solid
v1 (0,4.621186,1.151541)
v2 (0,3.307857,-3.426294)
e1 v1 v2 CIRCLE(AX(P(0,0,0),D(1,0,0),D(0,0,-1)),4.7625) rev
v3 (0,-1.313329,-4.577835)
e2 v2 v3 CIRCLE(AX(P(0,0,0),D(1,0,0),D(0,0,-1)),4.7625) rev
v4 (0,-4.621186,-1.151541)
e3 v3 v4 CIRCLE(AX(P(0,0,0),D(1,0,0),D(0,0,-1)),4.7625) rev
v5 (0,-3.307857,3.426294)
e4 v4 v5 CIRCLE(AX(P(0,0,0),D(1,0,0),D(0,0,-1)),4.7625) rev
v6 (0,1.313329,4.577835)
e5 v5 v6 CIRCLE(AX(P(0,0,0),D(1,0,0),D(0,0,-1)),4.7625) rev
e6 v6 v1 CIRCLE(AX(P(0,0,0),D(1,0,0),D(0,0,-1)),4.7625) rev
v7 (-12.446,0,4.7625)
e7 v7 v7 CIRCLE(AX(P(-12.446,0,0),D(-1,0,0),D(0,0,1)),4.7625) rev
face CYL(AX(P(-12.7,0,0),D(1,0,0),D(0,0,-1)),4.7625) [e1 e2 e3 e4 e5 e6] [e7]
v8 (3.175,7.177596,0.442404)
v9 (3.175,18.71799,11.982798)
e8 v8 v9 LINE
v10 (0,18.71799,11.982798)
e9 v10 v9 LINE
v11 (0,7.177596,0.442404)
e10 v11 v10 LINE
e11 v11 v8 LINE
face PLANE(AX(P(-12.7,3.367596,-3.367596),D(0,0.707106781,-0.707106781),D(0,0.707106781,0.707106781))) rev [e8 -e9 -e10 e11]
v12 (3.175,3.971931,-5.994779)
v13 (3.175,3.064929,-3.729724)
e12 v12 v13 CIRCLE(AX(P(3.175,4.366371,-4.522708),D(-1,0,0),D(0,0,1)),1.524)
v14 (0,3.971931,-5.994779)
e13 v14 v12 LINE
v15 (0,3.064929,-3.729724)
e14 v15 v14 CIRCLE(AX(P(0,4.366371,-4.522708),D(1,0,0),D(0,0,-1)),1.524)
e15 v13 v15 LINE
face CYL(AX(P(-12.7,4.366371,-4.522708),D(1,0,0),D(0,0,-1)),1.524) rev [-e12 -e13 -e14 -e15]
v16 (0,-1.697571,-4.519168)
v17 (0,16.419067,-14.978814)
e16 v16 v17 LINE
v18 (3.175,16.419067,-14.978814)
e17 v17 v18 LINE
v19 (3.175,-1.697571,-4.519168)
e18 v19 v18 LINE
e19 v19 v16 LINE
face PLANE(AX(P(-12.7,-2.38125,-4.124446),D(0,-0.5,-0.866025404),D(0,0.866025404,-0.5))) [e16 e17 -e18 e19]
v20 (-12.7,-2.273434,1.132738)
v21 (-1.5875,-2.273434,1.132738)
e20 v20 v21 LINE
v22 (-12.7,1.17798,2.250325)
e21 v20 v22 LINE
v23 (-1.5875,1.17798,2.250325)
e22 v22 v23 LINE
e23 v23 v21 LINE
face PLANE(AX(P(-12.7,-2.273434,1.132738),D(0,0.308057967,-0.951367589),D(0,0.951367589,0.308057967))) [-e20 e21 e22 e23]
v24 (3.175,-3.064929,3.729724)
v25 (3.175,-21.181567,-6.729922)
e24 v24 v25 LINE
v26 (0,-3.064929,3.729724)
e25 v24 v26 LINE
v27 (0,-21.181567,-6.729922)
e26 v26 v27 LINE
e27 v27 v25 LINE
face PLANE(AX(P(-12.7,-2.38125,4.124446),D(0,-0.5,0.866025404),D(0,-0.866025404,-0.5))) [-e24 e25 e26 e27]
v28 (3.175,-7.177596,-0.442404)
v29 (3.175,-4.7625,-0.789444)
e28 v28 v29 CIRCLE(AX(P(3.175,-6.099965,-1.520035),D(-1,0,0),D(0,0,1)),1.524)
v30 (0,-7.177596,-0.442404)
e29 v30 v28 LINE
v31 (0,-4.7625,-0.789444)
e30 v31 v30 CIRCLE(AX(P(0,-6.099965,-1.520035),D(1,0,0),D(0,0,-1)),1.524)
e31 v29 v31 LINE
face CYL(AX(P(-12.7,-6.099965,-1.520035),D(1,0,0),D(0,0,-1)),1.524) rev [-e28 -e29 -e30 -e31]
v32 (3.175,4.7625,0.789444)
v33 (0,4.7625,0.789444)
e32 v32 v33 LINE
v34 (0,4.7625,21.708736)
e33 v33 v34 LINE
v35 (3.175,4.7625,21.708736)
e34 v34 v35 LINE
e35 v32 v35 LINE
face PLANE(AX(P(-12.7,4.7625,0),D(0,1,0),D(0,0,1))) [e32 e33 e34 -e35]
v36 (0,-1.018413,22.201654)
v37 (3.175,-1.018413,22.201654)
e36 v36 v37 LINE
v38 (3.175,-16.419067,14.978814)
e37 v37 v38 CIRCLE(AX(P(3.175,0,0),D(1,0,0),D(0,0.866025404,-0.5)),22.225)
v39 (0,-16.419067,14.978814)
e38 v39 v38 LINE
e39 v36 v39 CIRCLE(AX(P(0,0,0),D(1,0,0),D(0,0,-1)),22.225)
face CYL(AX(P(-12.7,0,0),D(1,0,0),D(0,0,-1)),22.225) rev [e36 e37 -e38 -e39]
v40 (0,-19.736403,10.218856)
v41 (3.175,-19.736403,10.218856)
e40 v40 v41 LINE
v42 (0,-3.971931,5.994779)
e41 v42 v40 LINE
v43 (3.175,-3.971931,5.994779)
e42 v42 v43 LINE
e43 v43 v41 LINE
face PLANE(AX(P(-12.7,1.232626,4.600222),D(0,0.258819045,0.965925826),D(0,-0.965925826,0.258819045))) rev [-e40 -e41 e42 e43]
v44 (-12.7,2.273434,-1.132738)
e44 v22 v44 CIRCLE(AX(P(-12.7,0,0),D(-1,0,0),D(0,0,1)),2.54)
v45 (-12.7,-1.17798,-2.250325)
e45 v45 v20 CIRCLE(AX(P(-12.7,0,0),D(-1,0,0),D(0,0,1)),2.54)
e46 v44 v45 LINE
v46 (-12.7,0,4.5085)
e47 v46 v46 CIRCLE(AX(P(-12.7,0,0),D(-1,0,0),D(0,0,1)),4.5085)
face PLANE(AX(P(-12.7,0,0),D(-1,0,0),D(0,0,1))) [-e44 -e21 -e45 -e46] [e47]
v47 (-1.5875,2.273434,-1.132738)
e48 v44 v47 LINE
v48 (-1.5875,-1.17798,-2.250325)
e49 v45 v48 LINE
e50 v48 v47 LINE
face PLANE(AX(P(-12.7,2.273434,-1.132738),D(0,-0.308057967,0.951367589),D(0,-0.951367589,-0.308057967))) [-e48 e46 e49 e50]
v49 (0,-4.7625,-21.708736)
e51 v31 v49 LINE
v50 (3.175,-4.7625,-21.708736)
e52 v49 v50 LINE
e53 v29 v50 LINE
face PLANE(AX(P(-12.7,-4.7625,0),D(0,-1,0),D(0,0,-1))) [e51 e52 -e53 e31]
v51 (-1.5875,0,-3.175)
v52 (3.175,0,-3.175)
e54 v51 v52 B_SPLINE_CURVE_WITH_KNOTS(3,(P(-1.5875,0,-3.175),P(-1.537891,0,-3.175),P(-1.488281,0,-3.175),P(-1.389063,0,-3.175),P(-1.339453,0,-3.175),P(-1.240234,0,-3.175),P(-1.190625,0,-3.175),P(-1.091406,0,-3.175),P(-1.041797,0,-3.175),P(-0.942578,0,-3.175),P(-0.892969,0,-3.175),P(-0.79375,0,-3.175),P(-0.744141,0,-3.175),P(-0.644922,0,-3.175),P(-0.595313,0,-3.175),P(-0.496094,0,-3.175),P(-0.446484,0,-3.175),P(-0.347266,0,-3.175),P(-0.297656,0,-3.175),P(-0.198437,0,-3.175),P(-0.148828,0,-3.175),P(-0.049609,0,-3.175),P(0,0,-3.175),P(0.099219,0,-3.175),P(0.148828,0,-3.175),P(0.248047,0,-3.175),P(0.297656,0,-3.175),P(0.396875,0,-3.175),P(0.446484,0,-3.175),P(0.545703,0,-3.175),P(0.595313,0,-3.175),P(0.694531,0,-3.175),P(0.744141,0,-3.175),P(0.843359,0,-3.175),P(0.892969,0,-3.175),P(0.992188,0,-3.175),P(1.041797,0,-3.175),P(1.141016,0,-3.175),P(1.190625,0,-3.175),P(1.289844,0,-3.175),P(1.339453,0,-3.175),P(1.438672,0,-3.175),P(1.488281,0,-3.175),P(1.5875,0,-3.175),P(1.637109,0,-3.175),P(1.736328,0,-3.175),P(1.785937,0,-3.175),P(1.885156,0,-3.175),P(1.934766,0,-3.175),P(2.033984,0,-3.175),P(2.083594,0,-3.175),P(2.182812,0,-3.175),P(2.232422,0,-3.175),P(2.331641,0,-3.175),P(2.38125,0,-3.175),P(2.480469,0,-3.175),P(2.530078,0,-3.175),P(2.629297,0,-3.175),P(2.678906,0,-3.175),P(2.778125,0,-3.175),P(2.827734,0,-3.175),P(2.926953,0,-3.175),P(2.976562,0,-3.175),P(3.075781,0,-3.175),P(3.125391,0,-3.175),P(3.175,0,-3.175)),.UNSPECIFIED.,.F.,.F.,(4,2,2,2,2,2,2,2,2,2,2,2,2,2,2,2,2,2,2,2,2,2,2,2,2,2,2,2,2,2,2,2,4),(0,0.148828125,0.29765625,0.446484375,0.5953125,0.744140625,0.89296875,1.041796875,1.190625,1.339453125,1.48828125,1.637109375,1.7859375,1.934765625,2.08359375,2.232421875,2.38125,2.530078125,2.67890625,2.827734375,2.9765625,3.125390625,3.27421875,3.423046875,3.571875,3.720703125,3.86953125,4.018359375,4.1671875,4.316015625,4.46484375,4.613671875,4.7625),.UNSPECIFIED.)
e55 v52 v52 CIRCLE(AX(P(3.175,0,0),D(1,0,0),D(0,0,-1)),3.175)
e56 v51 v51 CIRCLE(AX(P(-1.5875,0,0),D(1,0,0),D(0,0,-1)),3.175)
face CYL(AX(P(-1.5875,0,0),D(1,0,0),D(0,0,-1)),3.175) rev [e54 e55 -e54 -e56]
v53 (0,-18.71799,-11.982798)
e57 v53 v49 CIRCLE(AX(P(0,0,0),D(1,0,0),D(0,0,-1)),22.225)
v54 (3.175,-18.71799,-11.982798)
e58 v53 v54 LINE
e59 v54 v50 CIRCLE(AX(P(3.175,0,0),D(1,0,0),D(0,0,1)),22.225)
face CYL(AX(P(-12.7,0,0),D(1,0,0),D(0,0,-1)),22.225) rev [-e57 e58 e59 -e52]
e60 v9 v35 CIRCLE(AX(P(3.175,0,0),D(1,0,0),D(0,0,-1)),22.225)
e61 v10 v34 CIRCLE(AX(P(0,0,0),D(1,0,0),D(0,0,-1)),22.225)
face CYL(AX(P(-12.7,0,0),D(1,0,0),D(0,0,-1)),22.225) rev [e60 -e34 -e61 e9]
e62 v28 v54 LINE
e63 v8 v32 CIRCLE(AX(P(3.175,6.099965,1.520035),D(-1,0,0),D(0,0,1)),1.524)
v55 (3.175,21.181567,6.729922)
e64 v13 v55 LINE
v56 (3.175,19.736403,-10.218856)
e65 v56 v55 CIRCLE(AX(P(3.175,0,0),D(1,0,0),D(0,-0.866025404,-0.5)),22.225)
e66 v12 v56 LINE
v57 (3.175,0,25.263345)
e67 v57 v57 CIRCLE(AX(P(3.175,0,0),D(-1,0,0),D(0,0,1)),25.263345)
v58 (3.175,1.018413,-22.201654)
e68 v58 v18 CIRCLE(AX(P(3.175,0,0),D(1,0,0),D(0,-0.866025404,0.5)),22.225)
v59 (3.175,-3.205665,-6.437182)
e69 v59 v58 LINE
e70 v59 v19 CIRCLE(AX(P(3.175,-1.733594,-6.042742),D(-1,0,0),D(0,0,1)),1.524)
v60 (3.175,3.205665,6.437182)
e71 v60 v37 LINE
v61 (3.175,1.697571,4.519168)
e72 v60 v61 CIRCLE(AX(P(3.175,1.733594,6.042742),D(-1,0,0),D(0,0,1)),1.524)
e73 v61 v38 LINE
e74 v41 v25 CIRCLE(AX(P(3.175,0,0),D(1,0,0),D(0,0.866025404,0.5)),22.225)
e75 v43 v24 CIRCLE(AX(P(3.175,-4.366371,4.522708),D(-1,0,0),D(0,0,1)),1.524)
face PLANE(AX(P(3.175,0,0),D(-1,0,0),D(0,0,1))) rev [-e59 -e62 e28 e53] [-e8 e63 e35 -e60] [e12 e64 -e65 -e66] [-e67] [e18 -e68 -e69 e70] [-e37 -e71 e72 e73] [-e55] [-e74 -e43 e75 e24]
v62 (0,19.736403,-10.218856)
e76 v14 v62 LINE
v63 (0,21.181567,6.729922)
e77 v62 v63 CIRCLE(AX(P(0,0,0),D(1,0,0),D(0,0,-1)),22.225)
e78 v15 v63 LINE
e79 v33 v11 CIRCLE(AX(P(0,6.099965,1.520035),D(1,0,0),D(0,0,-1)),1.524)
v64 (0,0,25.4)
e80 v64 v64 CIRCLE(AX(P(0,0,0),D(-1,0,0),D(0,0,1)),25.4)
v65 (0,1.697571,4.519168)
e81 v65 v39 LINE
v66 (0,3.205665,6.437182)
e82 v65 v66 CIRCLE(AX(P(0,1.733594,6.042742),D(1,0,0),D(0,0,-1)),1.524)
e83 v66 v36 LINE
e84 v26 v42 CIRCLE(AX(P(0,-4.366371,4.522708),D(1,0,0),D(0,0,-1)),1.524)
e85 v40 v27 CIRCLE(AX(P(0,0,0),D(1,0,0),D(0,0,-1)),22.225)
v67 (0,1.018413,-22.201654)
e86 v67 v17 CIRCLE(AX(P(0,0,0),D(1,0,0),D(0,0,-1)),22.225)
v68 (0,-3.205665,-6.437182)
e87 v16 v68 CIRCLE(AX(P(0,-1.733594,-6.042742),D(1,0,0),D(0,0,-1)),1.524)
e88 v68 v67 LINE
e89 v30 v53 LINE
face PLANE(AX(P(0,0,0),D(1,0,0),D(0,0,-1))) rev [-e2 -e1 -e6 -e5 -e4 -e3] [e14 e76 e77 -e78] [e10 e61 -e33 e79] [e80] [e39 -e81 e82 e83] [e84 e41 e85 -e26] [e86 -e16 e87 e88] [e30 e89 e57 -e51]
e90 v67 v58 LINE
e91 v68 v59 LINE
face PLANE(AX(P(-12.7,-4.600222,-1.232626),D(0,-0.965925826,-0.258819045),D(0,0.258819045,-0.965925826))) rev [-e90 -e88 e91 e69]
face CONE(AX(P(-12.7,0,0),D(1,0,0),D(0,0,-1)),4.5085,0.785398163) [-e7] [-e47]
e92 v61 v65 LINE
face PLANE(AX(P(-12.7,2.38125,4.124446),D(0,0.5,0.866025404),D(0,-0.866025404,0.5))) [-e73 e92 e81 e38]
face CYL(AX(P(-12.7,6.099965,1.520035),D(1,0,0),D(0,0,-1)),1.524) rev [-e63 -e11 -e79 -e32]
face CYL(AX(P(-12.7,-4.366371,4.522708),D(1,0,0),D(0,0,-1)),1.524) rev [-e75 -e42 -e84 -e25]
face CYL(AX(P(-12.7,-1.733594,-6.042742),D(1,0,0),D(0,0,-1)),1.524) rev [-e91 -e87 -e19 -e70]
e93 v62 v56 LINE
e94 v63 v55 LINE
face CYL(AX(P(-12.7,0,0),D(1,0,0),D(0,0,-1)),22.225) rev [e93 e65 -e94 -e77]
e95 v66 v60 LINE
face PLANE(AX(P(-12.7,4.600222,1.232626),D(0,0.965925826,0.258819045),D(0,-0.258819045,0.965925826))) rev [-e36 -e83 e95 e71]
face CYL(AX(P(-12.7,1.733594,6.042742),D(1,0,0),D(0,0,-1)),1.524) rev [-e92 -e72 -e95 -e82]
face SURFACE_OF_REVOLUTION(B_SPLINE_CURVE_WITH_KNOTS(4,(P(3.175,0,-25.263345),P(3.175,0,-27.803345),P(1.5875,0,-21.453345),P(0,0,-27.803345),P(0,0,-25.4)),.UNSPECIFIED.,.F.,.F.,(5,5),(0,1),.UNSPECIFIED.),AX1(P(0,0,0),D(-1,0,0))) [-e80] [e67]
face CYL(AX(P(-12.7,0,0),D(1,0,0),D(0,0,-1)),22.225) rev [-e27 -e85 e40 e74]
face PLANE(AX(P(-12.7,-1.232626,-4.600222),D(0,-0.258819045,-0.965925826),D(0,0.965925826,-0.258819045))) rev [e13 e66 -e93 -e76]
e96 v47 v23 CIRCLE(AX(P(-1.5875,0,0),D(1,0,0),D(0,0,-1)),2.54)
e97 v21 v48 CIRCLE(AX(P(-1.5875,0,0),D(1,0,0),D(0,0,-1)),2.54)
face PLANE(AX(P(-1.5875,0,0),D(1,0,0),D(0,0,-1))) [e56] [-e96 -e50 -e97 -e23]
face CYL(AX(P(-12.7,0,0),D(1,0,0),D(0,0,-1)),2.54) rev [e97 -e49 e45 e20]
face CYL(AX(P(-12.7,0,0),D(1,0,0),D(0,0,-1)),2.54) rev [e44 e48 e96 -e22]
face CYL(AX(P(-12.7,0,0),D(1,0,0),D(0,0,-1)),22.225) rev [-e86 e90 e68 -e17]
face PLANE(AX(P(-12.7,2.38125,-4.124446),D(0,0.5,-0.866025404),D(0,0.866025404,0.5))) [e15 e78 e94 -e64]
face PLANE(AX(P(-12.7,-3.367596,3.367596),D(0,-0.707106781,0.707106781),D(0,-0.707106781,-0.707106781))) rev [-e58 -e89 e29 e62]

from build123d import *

# Parameters (mm, degrees)
SKETCH2_R           = 4.7625
BOSS_EXTRUDE1_DEPTH = 12.7
CUT_EXTRUDE1_DEPTH  = 40.970251034
CIRPATTERN1_COUNT   = 6
FILLET1_DEPTH       = 3.175
CHAMFER1_SIZE       = 0.254
SKETCH4_R           = 3.175
CUT_EXTRUDE2_DEPTH  = 4.7625


with BuildPart() as part:
    # Sketch1 → Revolve1 (revolve)
    with BuildSketch(Plane(origin=(0, 0, 0), x_dir=(1, 0, 0), z_dir=(0, 1, 0))):
        with BuildLine():
            Line((0, 0), (3.175, 0))
            Line((3.175, 0), (3.175, 25.263345398))
            add(Edge.make_bspline(
                [(0, 25.4), (0, 27.803345398), (1.5875, 21.453345398), (3.175, 27.803345398), (3.175, 25.263345398)],
                knots=[0, 0, 0, 0, 0, 1, 1, 1, 1, 1], degree=4))
            Line((0, 25.4), (0, 0))
        make_face()
    revolve(axis=Axis((0, 0, 0), (1, 0, 0)))

    # Sketch2 → Boss-Extrude1 (add)
    with BuildSketch(Plane.ZY):
        with Locations(Location((0, 0, 0), (0, 0, 180))):
            Circle(SKETCH2_R)
        with BuildLine():
            Line((1.132738197, -2.273434446), (2.250324949, 1.177980315))
            ThreePointArc((2.250324949, 1.177980315), (0.782467236, 2.416473676), (-1.132738197, 2.273434446))
            Line((-1.132738197, 2.273434446), (-2.250324949, -1.177980315))
            ThreePointArc((-2.250324949, -1.177980315), (-0.782467236, -2.416473676), (1.132738197, -2.273434446))
        make_face(mode=Mode.SUBTRACT)
    extrude(amount=BOSS_EXTRUDE1_DEPTH)

    # Sketch3 → Cut-Extrude1 (cut, through all)
    with BuildSketch(Plane(origin=(3.175, 0, 0), x_dir=(0, 0, -1), z_dir=(1, 0, 0))):
        with BuildLine():
            Line((-21.708736001, 4.7625), (0, 4.7625))
            ThreePointArc((0, 4.7625), (1.822529847, 4.399976274), (3.367596045, 3.367596045))
            Line((3.367596045, 3.367596045), (-11.982798392, 18.717990483))
            ThreePointArc((-11.982798392, 18.717990483), (-18.233727021, 12.707549879), (-21.708736001, 4.7625))
        make_face()
    cut_extrude1 = extrude(amount=-CUT_EXTRUDE1_DEPTH, mode=Mode.SUBTRACT)

    # CirPattern1: Cut-Extrude1 ×6 about axis
    cirpattern1_axis = Axis((0, 0, 0), (1, 0, 0))
    for i in range(1, CIRPATTERN1_COUNT):
        add(cut_extrude1.rotate(cirpattern1_axis, i * 360 / CIRPATTERN1_COUNT), mode=Mode.SUBTRACT)

    # Fillet1: read off the stored shape, not the designer's step
    # Fillet1 outline → Fillet1 (add)
    with BuildSketch(Plane.YZ):
        with BuildLine():
            ThreePointArc((-3.971931086, 5.994778536), (-2.951584128, 5.089234917), (-3.064928685, 3.729723913))
            Line((-3.064928685, 3.729723913), (-2.38125, 4.124445986))
            ThreePointArc((-2.38125, 4.124445986), (-0.621630991, 4.721756152), (1.232625702, 4.600221748))
            Line((1.232625702, 4.600221748), (-3.971931086, 5.994778536))
        make_face()
        with BuildLine():
            ThreePointArc((-4.7625, 0), (-4.399976274, 1.822529847), (-3.367596045, 3.367596045))
            Line((-3.367596045, 3.367596045), (-7.177596045, -0.442403955))
            ThreePointArc((-7.177596045, -0.442403955), (-5.883198788, -0.011529378), (-4.7625, -0.789444146))
            Line((-4.7625, -0.789444146), (-4.7625, 0))
        make_face()
        with BuildLine():
            Line((1.697571315, 4.519168058), (2.38125, 4.124445986))
            ThreePointArc((2.38125, 4.124445986), (3.778345283, 2.899226306), (4.600221748, 1.232625702))
            Line((4.600221748, 1.232625702), (3.205664959, 6.437182491))
            ThreePointArc((3.205664959, 6.437182491), (2.93161466, 5.100764295), (1.697571315, 4.519168058))
        make_face()
        with BuildLine():
            ThreePointArc((-2.38125, -4.124445986), (-3.778345283, -2.899226306), (-4.600221748, -1.232625702))
            Line((-4.600221748, -1.232625702), (-3.205664959, -6.437182491))
            ThreePointArc((-3.205664959, -6.437182491), (-2.93161466, -5.100764295), (-1.697571315, -4.519168058))
            Line((-1.697571315, -4.519168058), (-2.38125, -4.124445986))
        make_face()
        with BuildLine():
            Line((4.7625, 0.789444146), (4.7625, 0))
            ThreePointArc((4.7625, 0), (4.399976274, -1.822529847), (3.367596045, -3.367596045))
            Line((3.367596045, -3.367596045), (7.177596045, 0.442403955))
            ThreePointArc((7.177596045, 0.442403955), (5.883198788, 0.011529378), (4.7625, 0.789444146))
        make_face()
        with BuildLine():
            ThreePointArc((2.38125, -4.124445986), (0.621630991, -4.721756152), (-1.232625702, -4.600221748))
            Line((-1.232625702, -4.600221748), (3.971931086, -5.994778536))
            ThreePointArc((3.971931086, -5.994778536), (2.951584128, -5.089234917), (3.064928685, -3.729723913))
            Line((3.064928685, -3.729723913), (2.38125, -4.124445986))
        make_face()
    extrude(amount=FILLET1_DEPTH)

    # Chamfer1
    chamfer1_edges = [part.edges().sort_by_distance(p)[0] for p in [
        (-12.7, 0, 4.7625),
    ]]
    chamfer(chamfer1_edges, length=CHAMFER1_SIZE)

    # Sketch4 → Cut-Extrude2 (cut)
    with BuildSketch(Plane(origin=(3.175, 0, 0), x_dir=(0, 0, -1), z_dir=(1, 0, 0))):
        Circle(SKETCH4_R)
    extrude(amount=-CUT_EXTRUDE2_DEPTH, mode=Mode.SUBTRACT)


solid = part.part
